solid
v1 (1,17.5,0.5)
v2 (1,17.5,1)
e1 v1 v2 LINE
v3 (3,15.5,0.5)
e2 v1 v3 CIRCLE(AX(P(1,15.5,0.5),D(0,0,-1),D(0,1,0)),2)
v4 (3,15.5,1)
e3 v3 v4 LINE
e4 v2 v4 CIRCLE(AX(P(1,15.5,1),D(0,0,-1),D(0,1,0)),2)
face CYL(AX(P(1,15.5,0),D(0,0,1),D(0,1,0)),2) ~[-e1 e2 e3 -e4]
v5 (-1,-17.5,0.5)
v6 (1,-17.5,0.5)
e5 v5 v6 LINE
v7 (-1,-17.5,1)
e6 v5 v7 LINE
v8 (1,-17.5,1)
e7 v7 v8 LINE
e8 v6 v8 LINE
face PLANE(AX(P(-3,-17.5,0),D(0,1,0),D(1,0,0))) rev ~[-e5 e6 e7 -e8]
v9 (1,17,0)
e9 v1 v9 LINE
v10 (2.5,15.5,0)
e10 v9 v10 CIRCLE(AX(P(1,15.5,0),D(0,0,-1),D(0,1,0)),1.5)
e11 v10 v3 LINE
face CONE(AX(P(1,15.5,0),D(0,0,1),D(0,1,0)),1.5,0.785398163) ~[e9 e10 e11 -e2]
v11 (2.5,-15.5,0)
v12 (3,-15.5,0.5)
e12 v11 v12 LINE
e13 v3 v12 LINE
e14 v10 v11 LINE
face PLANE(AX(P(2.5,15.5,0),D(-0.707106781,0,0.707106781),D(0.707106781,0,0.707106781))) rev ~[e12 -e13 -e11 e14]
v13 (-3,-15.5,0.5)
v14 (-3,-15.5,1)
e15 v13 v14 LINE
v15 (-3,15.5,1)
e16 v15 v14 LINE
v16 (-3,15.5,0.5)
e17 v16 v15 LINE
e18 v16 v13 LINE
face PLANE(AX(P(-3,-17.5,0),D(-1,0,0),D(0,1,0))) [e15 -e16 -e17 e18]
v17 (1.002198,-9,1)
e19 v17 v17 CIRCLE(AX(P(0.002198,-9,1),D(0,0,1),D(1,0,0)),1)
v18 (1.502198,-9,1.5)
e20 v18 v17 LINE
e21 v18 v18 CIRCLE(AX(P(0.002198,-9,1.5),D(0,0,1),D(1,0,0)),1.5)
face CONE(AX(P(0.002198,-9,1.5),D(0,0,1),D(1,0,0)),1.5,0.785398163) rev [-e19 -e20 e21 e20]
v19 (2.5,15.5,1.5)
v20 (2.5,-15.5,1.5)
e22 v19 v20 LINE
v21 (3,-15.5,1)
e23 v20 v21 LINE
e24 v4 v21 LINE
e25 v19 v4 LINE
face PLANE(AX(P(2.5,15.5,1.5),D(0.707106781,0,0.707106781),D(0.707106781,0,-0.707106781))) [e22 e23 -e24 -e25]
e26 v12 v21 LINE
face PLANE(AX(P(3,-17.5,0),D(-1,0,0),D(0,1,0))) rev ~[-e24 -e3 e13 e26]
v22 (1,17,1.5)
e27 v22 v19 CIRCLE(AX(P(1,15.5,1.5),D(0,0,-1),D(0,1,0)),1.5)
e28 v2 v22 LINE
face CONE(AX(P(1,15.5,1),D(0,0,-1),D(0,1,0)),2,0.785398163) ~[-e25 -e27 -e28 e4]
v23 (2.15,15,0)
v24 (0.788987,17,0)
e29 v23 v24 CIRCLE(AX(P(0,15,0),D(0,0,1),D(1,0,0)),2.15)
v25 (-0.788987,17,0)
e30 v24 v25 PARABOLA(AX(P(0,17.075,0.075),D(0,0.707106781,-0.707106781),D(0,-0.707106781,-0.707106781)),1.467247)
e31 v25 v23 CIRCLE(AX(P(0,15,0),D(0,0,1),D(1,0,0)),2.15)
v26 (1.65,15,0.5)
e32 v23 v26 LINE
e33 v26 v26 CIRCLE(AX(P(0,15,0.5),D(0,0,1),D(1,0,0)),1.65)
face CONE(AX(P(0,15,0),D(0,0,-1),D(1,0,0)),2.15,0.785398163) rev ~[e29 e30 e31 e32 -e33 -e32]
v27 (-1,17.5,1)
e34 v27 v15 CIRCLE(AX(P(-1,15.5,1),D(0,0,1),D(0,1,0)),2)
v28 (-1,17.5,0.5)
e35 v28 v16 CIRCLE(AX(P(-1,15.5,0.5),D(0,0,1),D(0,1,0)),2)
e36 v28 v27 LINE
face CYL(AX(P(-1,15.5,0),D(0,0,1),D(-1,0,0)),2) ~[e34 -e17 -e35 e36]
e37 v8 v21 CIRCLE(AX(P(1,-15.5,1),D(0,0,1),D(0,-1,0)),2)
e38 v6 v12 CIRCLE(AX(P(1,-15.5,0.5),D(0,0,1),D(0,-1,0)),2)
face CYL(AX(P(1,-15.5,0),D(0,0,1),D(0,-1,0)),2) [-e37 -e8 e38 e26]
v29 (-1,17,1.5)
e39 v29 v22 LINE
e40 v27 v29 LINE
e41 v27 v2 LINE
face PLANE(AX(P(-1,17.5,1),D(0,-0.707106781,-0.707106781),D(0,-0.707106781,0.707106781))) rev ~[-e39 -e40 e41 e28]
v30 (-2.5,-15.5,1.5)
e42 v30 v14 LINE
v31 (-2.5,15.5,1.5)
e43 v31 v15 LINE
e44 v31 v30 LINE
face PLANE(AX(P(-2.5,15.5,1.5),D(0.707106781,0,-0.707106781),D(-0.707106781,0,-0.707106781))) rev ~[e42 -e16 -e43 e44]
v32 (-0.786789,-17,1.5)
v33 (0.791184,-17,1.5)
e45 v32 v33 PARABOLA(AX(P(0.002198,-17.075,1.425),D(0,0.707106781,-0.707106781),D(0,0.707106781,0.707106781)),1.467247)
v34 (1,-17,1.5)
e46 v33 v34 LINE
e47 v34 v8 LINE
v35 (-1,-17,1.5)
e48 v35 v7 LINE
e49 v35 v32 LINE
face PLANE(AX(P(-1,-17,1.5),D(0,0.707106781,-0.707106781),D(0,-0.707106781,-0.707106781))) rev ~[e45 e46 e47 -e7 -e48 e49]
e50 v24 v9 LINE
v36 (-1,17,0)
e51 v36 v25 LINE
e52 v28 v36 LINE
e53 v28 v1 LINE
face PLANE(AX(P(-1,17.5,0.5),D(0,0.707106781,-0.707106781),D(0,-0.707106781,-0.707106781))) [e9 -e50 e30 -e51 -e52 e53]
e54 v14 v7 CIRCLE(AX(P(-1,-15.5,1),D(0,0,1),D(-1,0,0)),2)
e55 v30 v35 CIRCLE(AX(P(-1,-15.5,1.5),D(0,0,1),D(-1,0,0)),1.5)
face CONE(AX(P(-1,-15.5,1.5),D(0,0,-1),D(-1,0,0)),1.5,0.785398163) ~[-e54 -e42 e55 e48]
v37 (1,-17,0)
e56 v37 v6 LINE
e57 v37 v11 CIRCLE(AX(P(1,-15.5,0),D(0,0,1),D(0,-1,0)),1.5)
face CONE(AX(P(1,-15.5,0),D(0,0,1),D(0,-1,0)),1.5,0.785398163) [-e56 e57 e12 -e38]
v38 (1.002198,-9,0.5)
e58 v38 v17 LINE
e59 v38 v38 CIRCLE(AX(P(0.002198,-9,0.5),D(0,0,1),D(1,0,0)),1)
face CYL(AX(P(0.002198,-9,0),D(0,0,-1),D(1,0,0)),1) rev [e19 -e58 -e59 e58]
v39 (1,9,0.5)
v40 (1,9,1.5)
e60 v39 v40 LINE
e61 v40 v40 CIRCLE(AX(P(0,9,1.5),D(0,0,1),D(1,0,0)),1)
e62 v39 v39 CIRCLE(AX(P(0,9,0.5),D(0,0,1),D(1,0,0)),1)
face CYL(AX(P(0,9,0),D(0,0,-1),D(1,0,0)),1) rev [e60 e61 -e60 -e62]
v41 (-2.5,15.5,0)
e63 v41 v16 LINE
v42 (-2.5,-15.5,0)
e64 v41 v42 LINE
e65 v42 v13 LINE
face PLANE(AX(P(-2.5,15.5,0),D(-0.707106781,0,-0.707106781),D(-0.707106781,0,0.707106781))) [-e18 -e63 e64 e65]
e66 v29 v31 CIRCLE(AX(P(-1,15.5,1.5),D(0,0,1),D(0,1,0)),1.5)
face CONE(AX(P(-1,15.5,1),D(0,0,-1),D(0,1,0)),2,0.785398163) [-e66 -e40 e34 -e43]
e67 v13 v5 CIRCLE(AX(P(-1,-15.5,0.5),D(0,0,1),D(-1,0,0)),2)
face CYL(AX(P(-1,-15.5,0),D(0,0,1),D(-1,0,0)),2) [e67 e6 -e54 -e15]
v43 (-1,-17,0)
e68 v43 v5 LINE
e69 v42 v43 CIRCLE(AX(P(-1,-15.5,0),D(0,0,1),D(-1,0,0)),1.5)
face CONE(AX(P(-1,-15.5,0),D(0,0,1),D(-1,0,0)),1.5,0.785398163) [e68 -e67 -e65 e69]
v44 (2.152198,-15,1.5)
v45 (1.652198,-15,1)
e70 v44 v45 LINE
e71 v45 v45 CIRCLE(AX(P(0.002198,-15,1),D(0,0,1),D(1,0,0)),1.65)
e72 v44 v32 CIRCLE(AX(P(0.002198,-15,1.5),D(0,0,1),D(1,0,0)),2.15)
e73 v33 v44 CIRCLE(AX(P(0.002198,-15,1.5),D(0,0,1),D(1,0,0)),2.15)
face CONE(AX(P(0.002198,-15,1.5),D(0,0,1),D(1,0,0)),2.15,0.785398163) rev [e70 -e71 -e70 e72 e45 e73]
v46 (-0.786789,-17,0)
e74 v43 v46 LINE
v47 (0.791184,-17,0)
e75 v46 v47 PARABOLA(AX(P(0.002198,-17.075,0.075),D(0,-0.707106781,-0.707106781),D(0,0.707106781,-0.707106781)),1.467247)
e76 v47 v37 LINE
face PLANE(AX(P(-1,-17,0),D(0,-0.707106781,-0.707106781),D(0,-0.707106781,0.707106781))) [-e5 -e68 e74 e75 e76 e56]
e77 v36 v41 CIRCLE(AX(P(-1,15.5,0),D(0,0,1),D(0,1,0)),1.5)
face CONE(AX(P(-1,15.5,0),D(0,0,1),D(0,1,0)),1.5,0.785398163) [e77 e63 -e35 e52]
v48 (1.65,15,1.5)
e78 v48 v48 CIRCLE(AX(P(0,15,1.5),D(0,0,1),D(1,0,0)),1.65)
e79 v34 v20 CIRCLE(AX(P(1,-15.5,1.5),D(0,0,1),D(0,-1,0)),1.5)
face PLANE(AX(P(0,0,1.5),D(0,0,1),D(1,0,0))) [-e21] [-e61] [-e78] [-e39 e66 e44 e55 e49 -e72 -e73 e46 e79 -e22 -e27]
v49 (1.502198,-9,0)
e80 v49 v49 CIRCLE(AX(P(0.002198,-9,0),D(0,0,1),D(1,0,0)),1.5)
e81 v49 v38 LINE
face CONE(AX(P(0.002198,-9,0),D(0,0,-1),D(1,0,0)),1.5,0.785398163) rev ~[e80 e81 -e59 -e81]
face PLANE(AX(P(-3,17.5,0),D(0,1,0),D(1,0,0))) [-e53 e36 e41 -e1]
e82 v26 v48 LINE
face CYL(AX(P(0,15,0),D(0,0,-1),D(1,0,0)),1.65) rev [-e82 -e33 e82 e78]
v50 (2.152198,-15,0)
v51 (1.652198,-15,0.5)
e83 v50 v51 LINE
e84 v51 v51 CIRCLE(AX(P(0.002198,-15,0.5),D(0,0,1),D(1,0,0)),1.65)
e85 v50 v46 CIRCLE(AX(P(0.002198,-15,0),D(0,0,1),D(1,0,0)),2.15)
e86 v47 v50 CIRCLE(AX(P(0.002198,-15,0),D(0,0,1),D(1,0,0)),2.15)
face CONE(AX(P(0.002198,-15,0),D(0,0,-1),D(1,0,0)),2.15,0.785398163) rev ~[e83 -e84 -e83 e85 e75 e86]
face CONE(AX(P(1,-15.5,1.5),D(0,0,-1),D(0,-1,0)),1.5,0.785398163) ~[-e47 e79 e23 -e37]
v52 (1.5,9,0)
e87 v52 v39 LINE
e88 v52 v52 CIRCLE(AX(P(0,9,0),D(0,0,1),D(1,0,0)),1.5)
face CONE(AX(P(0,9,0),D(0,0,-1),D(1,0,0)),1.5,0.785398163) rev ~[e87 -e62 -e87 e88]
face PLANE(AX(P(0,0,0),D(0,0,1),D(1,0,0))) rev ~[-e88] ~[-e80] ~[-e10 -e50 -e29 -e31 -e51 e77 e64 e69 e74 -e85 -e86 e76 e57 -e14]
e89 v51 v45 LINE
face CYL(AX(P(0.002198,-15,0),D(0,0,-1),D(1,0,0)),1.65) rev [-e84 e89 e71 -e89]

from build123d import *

# Parameters (mm, degrees)
F0_W         = 6
F0_H         = 35
F0_R         = 1.65
F0_R_2       = 1
F1_DEPTH     = 1.5
F2_R         = 2
F3_T1_DEPTH  = 31
F3_T3_DEPTH  = 2
F3_T6_ANGLE  = 90
F3_T8_ANGLE  = 90
F3_T10_ANGLE = 90
F3_T12_ANGLE = 90
F3_T14_ANGLE = 90
F3_T16_ANGLE = 90
F3_T18_ANGLE = 90
F3_T20_ANGLE = 90


# Not quite as in the source:
# - a fillet or chamfer that OpenCascade refuses, or shapes differently, is made with other operations: its cross-section is extruded or revolved along the edge and cut away or added


with BuildPart() as f1:
    # F0 (on Top) → F1 (new body)
    with BuildSketch(Plane.XY):
        Rectangle(F0_W, F0_H)
        with Locations((0.0021975506, -14.9999999195)):
            Circle(F0_R, mode=Mode.SUBTRACT)
        with Locations((0.0021975506, -9)):
            Circle(F0_R_2, mode=Mode.SUBTRACT)
        with Locations((0, 9)):
            Circle(F0_R_2, mode=Mode.SUBTRACT)
        with Locations((0, 15)):
            Circle(F0_R, mode=Mode.SUBTRACT)
    extrude(amount=F1_DEPTH)

    # F2
    f2_edges = [f1.edges().sort_by_distance(p)[0] for p in [
        (-3, 17.5, 0.75),
        (3, 17.5, 0.75),
        (-3, -17.5, 0.75),
        (3, -17.5, 0.75),
    ]]
    fillet(f2_edges, radius=F2_R)

    # F3: chamfer of 0.5 on 22 edges, made by hand

    # F3_s2 → F3_t1 (cut)
    with BuildSketch(Plane.XZ.offset(-15.5)):
        Polygon((-2.5, 1.5), (-3, 1), (-3, 1.5), align=None)
        Polygon((2.5, 1.5), (3, 1), (3, 1.5), align=None)
        Polygon((2.5, 0), (3, 0.5), (3, 0), align=None)
        Polygon((-2.5, 0), (-3, 0.5), (-3, 0), align=None)
    extrude(amount=F3_T1_DEPTH, mode=Mode.SUBTRACT)

    # F3_s4 → F3_t3 (cut)
    with BuildSketch(Plane.YZ.offset(-1)):
        Polygon((17.5, 1), (17, 1.5), (17.5, 1.5), align=None)
        Polygon((-17, 1.5), (-17.5, 1), (-17.5, 1.5), align=None)
        Polygon((17.5, 0.5), (17, 0), (17.5, 0), align=None)
        Polygon((-17, 0), (-17.5, 0.5), (-17.5, 0), align=None)
    extrude(amount=F3_T3_DEPTH, mode=Mode.SUBTRACT)

    # F3_s5 → F3_t6 (revolve, cut)
    with BuildSketch(Plane.YZ.offset(1)):
        Polygon((17.5, 1), (17, 1.5), (17.5, 1.5), align=None)
    revolve(axis=Axis((1, 15.5, 1.5), (0, 0, -1)), revolution_arc=F3_T6_ANGLE, mode=Mode.SUBTRACT)

    # F3_s7 → F3_t8 (revolve, cut)
    with BuildSketch(Plane.YZ.offset(-1)):
        Polygon((17.5, 1), (17, 1.5), (17.5, 1.5), align=None)
    revolve(axis=Axis((-1, 15.5, 1.5), (0, 0, 1)), revolution_arc=F3_T8_ANGLE, mode=Mode.SUBTRACT)

    # F3_s9 → F3_t10 (revolve, cut)
    with BuildSketch(Plane.XZ.offset(15.5)):
        Polygon((-2.5, 1.5), (-3, 1), (-3, 1.5), align=None)
    revolve(axis=Axis((-1, -15.5, 1.5), (0, 0, 1)), revolution_arc=F3_T10_ANGLE, mode=Mode.SUBTRACT)

    # F3_s11 → F3_t12 (revolve, cut)
    with BuildSketch(Plane.YZ.offset(1)):
        Polygon((-17, 1.5), (-17.5, 1), (-17.5, 1.5), align=None)
    revolve(axis=Axis((1, -15.5, 1.5), (0, 0, 1)), revolution_arc=F3_T12_ANGLE, mode=Mode.SUBTRACT)

    # F3_s13 → F3_t14 (revolve, cut)
    with BuildSketch(Plane.YZ.offset(-1)):
        Polygon((17, 0), (17.5, 0.5), (17.5, 0), align=None)
    revolve(axis=Axis((-1, 15.5, 0), (0, 0, 1)), revolution_arc=F3_T14_ANGLE, mode=Mode.SUBTRACT)

    # F3_s15 → F3_t16 (revolve, cut)
    with BuildSketch(Plane.YZ.offset(1)):
        Polygon((17, 0), (17.5, 0.5), (17.5, 0), align=None)
    revolve(axis=Axis((1, 15.5, 0), (0, 0, -1)), revolution_arc=F3_T16_ANGLE, mode=Mode.SUBTRACT)

    # F3_s17 → F3_t18 (revolve, cut)
    with BuildSketch(Plane.XZ.offset(15.5)):
        Polygon((-2.5, 0), (-3, 0.5), (-3, 0), align=None)
    revolve(axis=Axis((-1, -15.5, 0), (0, 0, 1)), revolution_arc=F3_T18_ANGLE, mode=Mode.SUBTRACT)

    # F3_s19 → F3_t20 (revolve, cut)
    with BuildSketch(Plane.YZ.offset(1)):
        Polygon((-17, 0), (-17.5, 0.5), (-17.5, 0), align=None)
    revolve(axis=Axis((1, -15.5, 0), (0, 0, 1)), revolution_arc=F3_T20_ANGLE, mode=Mode.SUBTRACT)

    # F3_s21 → F3_t22 (revolve, cut)
    with BuildSketch(Plane.XZ.offset(9)):
        Polygon((1.5021975506, 0), (1.0021975506, 0.5), (1.0021975506, 0), align=None)
    revolve(axis=Axis((0.0021975506, -9, 0), (0, 0, 1)), mode=Mode.SUBTRACT)

    # F3_s23 → F3_t24 (revolve, cut)
    with BuildSketch(Plane.XZ.offset(-9)):
        Polygon((1.5, 0), (1, 0.5), (1, 0), align=None)
    revolve(axis=Axis((0, 9, 0), (0, 0, 1)), mode=Mode.SUBTRACT)

    # F3_s25 → F3_t26 (revolve, cut)
    with BuildSketch(Plane.XZ.offset(-15)):
        Polygon((2.15, 0), (1.65, 0.5), (1.65, 0), align=None)
    revolve(axis=Axis((0, 15, 0), (0, 0, 1)), mode=Mode.SUBTRACT)

    # F3_s27 → F3_t28 (revolve, cut)
    with BuildSketch(Plane.XZ.offset(9)):
        Polygon((1.5021975506, 1.5), (1.0021975506, 1), (1.0021975506, 1.5), align=None)
    revolve(axis=Axis((0.0021975506, -9, 1.5), (0, 0, 1)), mode=Mode.SUBTRACT)

    # F3_s29 → F3_t30 (revolve, cut)
    with BuildSketch(Plane.XZ.offset(14.9999999195)):
        Polygon((2.1521975506, 1.5), (1.6521975506, 1), (1.6521975506, 1.5), align=None)
    revolve(axis=Axis((0.0021975506, -14.9999999195, 1.5), (0, 0, 1)), mode=Mode.SUBTRACT)

    # F3_s31 → F3_t32 (revolve, cut)
    with BuildSketch(Plane.XZ.offset(14.9999999195)):
        Polygon((2.1521975506, 0), (1.6521975506, 0.5), (1.6521975506, 0), align=None)
    revolve(axis=Axis((0.0021975506, -14.9999999195, 0), (0, 0, 1)), mode=Mode.SUBTRACT)


solid = f1.part
